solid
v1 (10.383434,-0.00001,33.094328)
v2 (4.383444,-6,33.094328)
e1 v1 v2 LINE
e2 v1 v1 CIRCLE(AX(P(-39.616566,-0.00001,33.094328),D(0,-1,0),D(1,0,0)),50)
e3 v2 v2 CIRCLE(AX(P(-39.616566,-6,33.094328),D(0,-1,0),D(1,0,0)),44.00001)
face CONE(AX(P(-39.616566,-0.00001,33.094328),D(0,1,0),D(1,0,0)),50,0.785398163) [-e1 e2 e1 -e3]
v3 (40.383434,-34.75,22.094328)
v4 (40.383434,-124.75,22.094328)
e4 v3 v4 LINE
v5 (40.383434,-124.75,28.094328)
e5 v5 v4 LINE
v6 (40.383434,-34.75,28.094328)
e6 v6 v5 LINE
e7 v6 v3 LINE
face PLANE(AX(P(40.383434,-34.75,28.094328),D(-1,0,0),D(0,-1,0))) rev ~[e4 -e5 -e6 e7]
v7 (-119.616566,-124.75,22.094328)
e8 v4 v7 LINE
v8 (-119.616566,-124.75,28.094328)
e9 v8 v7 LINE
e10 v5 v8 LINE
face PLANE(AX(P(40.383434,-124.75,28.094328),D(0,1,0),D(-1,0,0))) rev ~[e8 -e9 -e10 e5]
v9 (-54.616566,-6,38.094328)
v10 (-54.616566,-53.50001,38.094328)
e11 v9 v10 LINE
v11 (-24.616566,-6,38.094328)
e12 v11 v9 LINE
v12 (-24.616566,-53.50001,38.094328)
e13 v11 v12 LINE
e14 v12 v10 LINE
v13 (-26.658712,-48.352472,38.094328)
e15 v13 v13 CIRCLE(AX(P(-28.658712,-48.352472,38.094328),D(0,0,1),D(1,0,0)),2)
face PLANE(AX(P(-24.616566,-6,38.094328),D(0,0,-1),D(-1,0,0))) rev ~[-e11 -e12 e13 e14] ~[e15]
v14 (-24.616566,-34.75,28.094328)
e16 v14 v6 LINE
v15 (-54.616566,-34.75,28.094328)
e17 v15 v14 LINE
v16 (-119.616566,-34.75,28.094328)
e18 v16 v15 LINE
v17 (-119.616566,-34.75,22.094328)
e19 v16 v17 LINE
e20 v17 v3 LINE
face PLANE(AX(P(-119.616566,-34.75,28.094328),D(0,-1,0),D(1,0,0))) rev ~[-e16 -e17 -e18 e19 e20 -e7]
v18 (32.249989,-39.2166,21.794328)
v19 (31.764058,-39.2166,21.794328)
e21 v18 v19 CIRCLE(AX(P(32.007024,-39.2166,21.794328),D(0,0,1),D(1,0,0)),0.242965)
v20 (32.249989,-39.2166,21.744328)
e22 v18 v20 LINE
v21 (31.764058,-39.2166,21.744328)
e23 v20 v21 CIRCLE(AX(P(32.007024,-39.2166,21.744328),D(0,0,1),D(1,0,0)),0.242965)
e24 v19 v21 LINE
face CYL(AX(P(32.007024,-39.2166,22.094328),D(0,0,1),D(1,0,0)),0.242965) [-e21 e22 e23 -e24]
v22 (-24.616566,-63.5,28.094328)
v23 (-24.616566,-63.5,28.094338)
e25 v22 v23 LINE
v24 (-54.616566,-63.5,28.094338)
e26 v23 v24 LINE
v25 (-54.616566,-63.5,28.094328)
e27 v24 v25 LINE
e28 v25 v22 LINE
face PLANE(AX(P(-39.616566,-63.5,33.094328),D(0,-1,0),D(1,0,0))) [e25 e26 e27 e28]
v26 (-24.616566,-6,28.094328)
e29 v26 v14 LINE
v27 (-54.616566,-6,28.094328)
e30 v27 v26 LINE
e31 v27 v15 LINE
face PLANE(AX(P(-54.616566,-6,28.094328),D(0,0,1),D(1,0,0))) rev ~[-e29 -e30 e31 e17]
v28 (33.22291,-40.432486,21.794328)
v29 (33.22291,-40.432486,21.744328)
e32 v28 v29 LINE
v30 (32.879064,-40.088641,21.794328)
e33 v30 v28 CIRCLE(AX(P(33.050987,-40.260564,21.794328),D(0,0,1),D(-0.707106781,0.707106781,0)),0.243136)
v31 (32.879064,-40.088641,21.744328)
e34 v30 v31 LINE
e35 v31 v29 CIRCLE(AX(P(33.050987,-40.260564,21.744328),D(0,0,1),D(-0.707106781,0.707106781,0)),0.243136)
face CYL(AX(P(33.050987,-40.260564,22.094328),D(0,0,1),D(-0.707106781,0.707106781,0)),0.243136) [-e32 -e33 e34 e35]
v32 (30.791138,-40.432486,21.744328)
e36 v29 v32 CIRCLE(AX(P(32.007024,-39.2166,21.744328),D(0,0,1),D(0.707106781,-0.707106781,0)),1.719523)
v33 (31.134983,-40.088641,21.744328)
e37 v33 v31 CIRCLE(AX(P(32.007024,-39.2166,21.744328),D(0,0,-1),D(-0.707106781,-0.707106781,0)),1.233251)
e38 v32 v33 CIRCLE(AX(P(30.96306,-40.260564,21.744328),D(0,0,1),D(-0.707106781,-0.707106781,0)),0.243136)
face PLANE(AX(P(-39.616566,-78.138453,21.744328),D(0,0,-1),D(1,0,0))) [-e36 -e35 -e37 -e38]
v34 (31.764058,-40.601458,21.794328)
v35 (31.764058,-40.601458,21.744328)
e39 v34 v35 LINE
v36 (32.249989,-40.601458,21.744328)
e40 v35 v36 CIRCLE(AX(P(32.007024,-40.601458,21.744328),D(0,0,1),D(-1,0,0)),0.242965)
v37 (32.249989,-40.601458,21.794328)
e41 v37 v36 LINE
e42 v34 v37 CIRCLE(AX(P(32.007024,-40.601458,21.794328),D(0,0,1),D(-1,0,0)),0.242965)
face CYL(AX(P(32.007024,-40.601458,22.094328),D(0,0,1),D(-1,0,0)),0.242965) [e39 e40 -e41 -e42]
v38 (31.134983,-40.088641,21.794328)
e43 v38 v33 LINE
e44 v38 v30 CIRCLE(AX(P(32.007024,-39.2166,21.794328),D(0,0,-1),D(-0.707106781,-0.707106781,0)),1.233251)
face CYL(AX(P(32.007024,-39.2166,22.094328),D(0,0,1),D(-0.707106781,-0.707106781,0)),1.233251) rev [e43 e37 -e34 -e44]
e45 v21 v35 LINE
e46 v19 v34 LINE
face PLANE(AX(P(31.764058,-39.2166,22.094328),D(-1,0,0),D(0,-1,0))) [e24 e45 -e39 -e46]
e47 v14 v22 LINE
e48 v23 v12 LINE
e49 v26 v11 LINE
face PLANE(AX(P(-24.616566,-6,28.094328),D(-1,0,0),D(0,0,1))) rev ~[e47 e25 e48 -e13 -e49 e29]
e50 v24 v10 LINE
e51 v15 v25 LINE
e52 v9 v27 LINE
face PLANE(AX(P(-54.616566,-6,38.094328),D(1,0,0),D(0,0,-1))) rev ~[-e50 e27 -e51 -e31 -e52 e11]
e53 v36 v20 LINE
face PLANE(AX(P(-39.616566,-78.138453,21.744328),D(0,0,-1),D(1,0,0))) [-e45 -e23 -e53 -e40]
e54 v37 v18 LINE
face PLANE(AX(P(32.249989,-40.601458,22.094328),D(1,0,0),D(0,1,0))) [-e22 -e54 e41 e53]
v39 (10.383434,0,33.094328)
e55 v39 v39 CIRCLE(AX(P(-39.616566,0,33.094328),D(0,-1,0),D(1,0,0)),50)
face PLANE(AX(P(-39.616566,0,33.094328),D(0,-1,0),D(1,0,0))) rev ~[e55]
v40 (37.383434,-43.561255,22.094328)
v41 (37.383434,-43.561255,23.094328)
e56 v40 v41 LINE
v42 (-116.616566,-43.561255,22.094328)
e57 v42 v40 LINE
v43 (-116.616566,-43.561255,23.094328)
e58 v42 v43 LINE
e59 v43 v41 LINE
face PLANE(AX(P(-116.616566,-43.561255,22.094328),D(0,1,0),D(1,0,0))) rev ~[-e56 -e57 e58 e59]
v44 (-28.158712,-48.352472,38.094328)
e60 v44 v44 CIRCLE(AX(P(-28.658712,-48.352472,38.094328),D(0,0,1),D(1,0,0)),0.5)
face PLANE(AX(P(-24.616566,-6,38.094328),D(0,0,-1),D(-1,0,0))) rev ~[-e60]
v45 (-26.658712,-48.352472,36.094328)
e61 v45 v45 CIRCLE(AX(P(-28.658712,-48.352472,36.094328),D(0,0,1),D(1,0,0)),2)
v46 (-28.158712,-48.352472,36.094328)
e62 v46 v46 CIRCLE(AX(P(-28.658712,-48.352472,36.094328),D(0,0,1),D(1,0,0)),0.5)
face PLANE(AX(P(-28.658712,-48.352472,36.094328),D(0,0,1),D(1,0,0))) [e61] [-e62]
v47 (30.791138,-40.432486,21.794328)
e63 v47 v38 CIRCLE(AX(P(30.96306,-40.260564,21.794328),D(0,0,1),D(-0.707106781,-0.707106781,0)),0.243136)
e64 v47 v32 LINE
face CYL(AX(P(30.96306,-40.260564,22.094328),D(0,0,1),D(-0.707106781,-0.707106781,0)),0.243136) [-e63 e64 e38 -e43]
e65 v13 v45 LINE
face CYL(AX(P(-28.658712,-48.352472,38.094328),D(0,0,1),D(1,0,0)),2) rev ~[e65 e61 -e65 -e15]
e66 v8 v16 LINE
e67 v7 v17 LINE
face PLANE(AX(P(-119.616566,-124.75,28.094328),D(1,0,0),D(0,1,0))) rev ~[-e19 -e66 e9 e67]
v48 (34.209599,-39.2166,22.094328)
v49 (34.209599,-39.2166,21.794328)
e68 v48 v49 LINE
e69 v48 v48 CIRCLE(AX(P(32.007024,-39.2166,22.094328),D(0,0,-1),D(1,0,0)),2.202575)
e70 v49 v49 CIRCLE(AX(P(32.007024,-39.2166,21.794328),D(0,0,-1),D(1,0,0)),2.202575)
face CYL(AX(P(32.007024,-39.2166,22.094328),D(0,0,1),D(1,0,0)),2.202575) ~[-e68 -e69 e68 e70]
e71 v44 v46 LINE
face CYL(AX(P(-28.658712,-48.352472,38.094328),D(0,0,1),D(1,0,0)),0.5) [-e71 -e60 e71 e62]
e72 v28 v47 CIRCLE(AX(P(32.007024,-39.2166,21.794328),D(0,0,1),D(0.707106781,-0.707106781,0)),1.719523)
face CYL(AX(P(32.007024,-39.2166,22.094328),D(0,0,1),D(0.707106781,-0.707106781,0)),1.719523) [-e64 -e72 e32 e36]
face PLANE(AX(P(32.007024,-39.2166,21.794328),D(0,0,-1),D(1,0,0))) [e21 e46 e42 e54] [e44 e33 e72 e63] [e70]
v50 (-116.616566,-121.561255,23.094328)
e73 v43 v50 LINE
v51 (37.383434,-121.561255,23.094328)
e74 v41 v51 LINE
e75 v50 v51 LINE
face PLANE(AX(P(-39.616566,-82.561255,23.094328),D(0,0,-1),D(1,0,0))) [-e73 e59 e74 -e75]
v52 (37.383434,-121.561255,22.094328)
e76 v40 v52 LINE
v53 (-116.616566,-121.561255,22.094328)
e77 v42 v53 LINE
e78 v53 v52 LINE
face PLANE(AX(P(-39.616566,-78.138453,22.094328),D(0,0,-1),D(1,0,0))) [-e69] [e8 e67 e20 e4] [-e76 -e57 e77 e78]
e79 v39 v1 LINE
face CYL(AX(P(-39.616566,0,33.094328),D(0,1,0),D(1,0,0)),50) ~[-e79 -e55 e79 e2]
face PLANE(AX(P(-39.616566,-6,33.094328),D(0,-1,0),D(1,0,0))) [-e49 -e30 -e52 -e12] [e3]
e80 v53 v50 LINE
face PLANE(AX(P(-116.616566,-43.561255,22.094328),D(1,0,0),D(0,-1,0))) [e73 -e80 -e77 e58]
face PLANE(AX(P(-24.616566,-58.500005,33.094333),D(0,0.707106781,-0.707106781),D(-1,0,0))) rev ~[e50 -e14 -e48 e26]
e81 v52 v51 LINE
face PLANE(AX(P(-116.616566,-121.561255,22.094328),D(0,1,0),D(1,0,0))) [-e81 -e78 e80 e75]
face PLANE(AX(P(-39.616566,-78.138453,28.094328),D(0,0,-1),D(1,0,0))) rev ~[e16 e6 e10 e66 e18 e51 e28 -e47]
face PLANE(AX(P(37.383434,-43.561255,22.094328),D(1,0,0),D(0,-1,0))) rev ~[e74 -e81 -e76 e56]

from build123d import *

# Parameters (mm, degrees)
F0_R      = 50
F1_DEPTH  = 6
F2_SIZE   = 5.99999
F4_DEPTH  = 57.5
F5_W      = 15
F5_H      = 28.75
F6_DEPTH  = 6
F7_W      = 154
F7_H      = 78
F8_DEPTH  = 1
F9_SIZE   = 9.99999
F10_R     = 2.2025754481
F11_DEPTH = 0.3
F12_DEPTH = 0.35
F13_R     = 2
F13_R_2   = 0.5
F14_DEPTH = 2


# Not quite as in the source:
# - a fillet or chamfer is up to 0.001 mm smaller than in the source, because OpenCascade refuses the exact size


with BuildPart() as f1:
    # F0 (on Front) → F1 (new body)
    with BuildSketch(Plane.XZ):
        with Locations((-39.6165661514, 33.0943278968)):
            Circle(F0_R)
    extrude(amount=F1_DEPTH)

    # F2 (size 6 in the source; OpenCascade refuses exactly that, so slightly less here)
    f2_edges = [f1.edges().sort_by_distance(p)[0] for p in [
        (-89.616566, -6, 33.094328),
    ]]
    chamfer(f2_edges, length=F2_SIZE)

    # F3 (on face) → F4 (join)
    with BuildSketch(Plane.XZ.offset(6)):
        Polygon((-54.6165661514, 28.0943278968), (-39.6165661514, 28.0943278968), (-24.6165661514, 28.0943278968), (-24.6165661514, 38.0943278968), (-39.6165661514, 38.0943278968), (-54.6165661514, 38.0943278968), align=None)
    extrude(amount=F4_DEPTH)

    # F5 (on face) → F6 (join)
    with BuildSketch(Plane(origin=(0, 0, 28.0943278968), x_dir=(1, 0, 0), z_dir=(0, 0, -1))):
        Polygon((-119.6165661514, 34.75), (-54.6165661514, 34.75), (-54.6165661514, 63.5), (-39.6165661514, 63.5), (-24.6165661514, 63.5), (-24.6165661514, 34.75), (40.3834338486, 34.75), (40.3834338486, 124.75), (-39.6165661514, 124.75), (-119.6165661514, 124.75), align=None)
        with Locations((-32.1165661514, 49.125)):
            Rectangle(F5_W, F5_H)
        with Locations((-47.1165661514, 49.125)):
            Rectangle(F5_W, F5_H)
    extrude(amount=F6_DEPTH)

    # F7 (on face) → F8 (cut)
    with BuildSketch(Plane(origin=(0, 0, 22.0943278968), x_dir=(1, 0, 0), z_dir=(0, 0, -1))):
        with Locations((-39.6165661514, 82.5612554252)):
            Rectangle(F7_W, F7_H)
    extrude(amount=-F8_DEPTH, mode=Mode.SUBTRACT)

    # F9 (size 10 in the source; OpenCascade refuses exactly that, so slightly less here)
    f9_edges = [f1.edges().sort_by_distance(p)[0] for p in [
        (-39.616566, -63.5, 38.094328),
    ]]
    chamfer(f9_edges, length=F9_SIZE)

    # F10 (on face) → F11 (join)
    with BuildSketch(Plane(origin=(0, 0, 22.0943278968), x_dir=(1, 0, 0), z_dir=(0, 0, -1))):
        with Locations((32.0070236921, 39.2166003585)):
            Circle(F10_R)
        with BuildLine():
            ThreePointArc((33.2229098133, 40.4324864797), (32.0070236921, 37.4970777156), (30.7911375709, 40.4324864797))
            ThreePointArc((30.7911375709, 40.4324864797), (31.1349833923, 40.4324864797), (31.1349833923, 40.0886406584))
            ThreePointArc((31.1349833923, 40.0886406584), (32.0070236921, 37.9833491395), (32.879063992, 40.0886406584))
            ThreePointArc((32.879063992, 40.0886406584), (32.879063992, 40.4324864797), (33.2229098133, 40.4324864797))
        make_face(mode=Mode.SUBTRACT)
        with BuildLine():
            ThreePointArc((32.2499889227, 39.2166003585), (32.0070236921, 38.9736351279), (31.7640584616, 39.2166003585))
            Line((31.7640584616, 39.2166003585), (31.7640584616, 40.6014584005))
            ThreePointArc((31.7640584616, 40.6014584005), (32.0070236921, 40.844423631), (32.2499889227, 40.6014584005))
            Line((32.2499889227, 40.6014584005), (32.2499889227, 39.2166003585))
        make_face(mode=Mode.SUBTRACT)
    extrude(amount=F11_DEPTH)

    # F12 (add): faces of the model
    f12_faces = [f1.faces().sort_by_distance(p)[0] for p in [
        (32.0070236921, -39.9090293795, 22.0943278968),
        (32.0070236921, -37.5427579145, 22.0943278968),
    ]]
    extrude(f12_faces, amount=F12_DEPTH)

    # F13 (on face) → F14 (cut)
    with BuildSketch(Plane.XY.offset(38.0943278968)):
        with Locations((-28.6587122828, -48.3524724841)):
            Circle(F13_R)
        with Locations((-28.6587122828, -48.3524724841)):
            Circle(F13_R_2, mode=Mode.SUBTRACT)
    extrude(amount=-F14_DEPTH, mode=Mode.SUBTRACT)


solid = f1.part
